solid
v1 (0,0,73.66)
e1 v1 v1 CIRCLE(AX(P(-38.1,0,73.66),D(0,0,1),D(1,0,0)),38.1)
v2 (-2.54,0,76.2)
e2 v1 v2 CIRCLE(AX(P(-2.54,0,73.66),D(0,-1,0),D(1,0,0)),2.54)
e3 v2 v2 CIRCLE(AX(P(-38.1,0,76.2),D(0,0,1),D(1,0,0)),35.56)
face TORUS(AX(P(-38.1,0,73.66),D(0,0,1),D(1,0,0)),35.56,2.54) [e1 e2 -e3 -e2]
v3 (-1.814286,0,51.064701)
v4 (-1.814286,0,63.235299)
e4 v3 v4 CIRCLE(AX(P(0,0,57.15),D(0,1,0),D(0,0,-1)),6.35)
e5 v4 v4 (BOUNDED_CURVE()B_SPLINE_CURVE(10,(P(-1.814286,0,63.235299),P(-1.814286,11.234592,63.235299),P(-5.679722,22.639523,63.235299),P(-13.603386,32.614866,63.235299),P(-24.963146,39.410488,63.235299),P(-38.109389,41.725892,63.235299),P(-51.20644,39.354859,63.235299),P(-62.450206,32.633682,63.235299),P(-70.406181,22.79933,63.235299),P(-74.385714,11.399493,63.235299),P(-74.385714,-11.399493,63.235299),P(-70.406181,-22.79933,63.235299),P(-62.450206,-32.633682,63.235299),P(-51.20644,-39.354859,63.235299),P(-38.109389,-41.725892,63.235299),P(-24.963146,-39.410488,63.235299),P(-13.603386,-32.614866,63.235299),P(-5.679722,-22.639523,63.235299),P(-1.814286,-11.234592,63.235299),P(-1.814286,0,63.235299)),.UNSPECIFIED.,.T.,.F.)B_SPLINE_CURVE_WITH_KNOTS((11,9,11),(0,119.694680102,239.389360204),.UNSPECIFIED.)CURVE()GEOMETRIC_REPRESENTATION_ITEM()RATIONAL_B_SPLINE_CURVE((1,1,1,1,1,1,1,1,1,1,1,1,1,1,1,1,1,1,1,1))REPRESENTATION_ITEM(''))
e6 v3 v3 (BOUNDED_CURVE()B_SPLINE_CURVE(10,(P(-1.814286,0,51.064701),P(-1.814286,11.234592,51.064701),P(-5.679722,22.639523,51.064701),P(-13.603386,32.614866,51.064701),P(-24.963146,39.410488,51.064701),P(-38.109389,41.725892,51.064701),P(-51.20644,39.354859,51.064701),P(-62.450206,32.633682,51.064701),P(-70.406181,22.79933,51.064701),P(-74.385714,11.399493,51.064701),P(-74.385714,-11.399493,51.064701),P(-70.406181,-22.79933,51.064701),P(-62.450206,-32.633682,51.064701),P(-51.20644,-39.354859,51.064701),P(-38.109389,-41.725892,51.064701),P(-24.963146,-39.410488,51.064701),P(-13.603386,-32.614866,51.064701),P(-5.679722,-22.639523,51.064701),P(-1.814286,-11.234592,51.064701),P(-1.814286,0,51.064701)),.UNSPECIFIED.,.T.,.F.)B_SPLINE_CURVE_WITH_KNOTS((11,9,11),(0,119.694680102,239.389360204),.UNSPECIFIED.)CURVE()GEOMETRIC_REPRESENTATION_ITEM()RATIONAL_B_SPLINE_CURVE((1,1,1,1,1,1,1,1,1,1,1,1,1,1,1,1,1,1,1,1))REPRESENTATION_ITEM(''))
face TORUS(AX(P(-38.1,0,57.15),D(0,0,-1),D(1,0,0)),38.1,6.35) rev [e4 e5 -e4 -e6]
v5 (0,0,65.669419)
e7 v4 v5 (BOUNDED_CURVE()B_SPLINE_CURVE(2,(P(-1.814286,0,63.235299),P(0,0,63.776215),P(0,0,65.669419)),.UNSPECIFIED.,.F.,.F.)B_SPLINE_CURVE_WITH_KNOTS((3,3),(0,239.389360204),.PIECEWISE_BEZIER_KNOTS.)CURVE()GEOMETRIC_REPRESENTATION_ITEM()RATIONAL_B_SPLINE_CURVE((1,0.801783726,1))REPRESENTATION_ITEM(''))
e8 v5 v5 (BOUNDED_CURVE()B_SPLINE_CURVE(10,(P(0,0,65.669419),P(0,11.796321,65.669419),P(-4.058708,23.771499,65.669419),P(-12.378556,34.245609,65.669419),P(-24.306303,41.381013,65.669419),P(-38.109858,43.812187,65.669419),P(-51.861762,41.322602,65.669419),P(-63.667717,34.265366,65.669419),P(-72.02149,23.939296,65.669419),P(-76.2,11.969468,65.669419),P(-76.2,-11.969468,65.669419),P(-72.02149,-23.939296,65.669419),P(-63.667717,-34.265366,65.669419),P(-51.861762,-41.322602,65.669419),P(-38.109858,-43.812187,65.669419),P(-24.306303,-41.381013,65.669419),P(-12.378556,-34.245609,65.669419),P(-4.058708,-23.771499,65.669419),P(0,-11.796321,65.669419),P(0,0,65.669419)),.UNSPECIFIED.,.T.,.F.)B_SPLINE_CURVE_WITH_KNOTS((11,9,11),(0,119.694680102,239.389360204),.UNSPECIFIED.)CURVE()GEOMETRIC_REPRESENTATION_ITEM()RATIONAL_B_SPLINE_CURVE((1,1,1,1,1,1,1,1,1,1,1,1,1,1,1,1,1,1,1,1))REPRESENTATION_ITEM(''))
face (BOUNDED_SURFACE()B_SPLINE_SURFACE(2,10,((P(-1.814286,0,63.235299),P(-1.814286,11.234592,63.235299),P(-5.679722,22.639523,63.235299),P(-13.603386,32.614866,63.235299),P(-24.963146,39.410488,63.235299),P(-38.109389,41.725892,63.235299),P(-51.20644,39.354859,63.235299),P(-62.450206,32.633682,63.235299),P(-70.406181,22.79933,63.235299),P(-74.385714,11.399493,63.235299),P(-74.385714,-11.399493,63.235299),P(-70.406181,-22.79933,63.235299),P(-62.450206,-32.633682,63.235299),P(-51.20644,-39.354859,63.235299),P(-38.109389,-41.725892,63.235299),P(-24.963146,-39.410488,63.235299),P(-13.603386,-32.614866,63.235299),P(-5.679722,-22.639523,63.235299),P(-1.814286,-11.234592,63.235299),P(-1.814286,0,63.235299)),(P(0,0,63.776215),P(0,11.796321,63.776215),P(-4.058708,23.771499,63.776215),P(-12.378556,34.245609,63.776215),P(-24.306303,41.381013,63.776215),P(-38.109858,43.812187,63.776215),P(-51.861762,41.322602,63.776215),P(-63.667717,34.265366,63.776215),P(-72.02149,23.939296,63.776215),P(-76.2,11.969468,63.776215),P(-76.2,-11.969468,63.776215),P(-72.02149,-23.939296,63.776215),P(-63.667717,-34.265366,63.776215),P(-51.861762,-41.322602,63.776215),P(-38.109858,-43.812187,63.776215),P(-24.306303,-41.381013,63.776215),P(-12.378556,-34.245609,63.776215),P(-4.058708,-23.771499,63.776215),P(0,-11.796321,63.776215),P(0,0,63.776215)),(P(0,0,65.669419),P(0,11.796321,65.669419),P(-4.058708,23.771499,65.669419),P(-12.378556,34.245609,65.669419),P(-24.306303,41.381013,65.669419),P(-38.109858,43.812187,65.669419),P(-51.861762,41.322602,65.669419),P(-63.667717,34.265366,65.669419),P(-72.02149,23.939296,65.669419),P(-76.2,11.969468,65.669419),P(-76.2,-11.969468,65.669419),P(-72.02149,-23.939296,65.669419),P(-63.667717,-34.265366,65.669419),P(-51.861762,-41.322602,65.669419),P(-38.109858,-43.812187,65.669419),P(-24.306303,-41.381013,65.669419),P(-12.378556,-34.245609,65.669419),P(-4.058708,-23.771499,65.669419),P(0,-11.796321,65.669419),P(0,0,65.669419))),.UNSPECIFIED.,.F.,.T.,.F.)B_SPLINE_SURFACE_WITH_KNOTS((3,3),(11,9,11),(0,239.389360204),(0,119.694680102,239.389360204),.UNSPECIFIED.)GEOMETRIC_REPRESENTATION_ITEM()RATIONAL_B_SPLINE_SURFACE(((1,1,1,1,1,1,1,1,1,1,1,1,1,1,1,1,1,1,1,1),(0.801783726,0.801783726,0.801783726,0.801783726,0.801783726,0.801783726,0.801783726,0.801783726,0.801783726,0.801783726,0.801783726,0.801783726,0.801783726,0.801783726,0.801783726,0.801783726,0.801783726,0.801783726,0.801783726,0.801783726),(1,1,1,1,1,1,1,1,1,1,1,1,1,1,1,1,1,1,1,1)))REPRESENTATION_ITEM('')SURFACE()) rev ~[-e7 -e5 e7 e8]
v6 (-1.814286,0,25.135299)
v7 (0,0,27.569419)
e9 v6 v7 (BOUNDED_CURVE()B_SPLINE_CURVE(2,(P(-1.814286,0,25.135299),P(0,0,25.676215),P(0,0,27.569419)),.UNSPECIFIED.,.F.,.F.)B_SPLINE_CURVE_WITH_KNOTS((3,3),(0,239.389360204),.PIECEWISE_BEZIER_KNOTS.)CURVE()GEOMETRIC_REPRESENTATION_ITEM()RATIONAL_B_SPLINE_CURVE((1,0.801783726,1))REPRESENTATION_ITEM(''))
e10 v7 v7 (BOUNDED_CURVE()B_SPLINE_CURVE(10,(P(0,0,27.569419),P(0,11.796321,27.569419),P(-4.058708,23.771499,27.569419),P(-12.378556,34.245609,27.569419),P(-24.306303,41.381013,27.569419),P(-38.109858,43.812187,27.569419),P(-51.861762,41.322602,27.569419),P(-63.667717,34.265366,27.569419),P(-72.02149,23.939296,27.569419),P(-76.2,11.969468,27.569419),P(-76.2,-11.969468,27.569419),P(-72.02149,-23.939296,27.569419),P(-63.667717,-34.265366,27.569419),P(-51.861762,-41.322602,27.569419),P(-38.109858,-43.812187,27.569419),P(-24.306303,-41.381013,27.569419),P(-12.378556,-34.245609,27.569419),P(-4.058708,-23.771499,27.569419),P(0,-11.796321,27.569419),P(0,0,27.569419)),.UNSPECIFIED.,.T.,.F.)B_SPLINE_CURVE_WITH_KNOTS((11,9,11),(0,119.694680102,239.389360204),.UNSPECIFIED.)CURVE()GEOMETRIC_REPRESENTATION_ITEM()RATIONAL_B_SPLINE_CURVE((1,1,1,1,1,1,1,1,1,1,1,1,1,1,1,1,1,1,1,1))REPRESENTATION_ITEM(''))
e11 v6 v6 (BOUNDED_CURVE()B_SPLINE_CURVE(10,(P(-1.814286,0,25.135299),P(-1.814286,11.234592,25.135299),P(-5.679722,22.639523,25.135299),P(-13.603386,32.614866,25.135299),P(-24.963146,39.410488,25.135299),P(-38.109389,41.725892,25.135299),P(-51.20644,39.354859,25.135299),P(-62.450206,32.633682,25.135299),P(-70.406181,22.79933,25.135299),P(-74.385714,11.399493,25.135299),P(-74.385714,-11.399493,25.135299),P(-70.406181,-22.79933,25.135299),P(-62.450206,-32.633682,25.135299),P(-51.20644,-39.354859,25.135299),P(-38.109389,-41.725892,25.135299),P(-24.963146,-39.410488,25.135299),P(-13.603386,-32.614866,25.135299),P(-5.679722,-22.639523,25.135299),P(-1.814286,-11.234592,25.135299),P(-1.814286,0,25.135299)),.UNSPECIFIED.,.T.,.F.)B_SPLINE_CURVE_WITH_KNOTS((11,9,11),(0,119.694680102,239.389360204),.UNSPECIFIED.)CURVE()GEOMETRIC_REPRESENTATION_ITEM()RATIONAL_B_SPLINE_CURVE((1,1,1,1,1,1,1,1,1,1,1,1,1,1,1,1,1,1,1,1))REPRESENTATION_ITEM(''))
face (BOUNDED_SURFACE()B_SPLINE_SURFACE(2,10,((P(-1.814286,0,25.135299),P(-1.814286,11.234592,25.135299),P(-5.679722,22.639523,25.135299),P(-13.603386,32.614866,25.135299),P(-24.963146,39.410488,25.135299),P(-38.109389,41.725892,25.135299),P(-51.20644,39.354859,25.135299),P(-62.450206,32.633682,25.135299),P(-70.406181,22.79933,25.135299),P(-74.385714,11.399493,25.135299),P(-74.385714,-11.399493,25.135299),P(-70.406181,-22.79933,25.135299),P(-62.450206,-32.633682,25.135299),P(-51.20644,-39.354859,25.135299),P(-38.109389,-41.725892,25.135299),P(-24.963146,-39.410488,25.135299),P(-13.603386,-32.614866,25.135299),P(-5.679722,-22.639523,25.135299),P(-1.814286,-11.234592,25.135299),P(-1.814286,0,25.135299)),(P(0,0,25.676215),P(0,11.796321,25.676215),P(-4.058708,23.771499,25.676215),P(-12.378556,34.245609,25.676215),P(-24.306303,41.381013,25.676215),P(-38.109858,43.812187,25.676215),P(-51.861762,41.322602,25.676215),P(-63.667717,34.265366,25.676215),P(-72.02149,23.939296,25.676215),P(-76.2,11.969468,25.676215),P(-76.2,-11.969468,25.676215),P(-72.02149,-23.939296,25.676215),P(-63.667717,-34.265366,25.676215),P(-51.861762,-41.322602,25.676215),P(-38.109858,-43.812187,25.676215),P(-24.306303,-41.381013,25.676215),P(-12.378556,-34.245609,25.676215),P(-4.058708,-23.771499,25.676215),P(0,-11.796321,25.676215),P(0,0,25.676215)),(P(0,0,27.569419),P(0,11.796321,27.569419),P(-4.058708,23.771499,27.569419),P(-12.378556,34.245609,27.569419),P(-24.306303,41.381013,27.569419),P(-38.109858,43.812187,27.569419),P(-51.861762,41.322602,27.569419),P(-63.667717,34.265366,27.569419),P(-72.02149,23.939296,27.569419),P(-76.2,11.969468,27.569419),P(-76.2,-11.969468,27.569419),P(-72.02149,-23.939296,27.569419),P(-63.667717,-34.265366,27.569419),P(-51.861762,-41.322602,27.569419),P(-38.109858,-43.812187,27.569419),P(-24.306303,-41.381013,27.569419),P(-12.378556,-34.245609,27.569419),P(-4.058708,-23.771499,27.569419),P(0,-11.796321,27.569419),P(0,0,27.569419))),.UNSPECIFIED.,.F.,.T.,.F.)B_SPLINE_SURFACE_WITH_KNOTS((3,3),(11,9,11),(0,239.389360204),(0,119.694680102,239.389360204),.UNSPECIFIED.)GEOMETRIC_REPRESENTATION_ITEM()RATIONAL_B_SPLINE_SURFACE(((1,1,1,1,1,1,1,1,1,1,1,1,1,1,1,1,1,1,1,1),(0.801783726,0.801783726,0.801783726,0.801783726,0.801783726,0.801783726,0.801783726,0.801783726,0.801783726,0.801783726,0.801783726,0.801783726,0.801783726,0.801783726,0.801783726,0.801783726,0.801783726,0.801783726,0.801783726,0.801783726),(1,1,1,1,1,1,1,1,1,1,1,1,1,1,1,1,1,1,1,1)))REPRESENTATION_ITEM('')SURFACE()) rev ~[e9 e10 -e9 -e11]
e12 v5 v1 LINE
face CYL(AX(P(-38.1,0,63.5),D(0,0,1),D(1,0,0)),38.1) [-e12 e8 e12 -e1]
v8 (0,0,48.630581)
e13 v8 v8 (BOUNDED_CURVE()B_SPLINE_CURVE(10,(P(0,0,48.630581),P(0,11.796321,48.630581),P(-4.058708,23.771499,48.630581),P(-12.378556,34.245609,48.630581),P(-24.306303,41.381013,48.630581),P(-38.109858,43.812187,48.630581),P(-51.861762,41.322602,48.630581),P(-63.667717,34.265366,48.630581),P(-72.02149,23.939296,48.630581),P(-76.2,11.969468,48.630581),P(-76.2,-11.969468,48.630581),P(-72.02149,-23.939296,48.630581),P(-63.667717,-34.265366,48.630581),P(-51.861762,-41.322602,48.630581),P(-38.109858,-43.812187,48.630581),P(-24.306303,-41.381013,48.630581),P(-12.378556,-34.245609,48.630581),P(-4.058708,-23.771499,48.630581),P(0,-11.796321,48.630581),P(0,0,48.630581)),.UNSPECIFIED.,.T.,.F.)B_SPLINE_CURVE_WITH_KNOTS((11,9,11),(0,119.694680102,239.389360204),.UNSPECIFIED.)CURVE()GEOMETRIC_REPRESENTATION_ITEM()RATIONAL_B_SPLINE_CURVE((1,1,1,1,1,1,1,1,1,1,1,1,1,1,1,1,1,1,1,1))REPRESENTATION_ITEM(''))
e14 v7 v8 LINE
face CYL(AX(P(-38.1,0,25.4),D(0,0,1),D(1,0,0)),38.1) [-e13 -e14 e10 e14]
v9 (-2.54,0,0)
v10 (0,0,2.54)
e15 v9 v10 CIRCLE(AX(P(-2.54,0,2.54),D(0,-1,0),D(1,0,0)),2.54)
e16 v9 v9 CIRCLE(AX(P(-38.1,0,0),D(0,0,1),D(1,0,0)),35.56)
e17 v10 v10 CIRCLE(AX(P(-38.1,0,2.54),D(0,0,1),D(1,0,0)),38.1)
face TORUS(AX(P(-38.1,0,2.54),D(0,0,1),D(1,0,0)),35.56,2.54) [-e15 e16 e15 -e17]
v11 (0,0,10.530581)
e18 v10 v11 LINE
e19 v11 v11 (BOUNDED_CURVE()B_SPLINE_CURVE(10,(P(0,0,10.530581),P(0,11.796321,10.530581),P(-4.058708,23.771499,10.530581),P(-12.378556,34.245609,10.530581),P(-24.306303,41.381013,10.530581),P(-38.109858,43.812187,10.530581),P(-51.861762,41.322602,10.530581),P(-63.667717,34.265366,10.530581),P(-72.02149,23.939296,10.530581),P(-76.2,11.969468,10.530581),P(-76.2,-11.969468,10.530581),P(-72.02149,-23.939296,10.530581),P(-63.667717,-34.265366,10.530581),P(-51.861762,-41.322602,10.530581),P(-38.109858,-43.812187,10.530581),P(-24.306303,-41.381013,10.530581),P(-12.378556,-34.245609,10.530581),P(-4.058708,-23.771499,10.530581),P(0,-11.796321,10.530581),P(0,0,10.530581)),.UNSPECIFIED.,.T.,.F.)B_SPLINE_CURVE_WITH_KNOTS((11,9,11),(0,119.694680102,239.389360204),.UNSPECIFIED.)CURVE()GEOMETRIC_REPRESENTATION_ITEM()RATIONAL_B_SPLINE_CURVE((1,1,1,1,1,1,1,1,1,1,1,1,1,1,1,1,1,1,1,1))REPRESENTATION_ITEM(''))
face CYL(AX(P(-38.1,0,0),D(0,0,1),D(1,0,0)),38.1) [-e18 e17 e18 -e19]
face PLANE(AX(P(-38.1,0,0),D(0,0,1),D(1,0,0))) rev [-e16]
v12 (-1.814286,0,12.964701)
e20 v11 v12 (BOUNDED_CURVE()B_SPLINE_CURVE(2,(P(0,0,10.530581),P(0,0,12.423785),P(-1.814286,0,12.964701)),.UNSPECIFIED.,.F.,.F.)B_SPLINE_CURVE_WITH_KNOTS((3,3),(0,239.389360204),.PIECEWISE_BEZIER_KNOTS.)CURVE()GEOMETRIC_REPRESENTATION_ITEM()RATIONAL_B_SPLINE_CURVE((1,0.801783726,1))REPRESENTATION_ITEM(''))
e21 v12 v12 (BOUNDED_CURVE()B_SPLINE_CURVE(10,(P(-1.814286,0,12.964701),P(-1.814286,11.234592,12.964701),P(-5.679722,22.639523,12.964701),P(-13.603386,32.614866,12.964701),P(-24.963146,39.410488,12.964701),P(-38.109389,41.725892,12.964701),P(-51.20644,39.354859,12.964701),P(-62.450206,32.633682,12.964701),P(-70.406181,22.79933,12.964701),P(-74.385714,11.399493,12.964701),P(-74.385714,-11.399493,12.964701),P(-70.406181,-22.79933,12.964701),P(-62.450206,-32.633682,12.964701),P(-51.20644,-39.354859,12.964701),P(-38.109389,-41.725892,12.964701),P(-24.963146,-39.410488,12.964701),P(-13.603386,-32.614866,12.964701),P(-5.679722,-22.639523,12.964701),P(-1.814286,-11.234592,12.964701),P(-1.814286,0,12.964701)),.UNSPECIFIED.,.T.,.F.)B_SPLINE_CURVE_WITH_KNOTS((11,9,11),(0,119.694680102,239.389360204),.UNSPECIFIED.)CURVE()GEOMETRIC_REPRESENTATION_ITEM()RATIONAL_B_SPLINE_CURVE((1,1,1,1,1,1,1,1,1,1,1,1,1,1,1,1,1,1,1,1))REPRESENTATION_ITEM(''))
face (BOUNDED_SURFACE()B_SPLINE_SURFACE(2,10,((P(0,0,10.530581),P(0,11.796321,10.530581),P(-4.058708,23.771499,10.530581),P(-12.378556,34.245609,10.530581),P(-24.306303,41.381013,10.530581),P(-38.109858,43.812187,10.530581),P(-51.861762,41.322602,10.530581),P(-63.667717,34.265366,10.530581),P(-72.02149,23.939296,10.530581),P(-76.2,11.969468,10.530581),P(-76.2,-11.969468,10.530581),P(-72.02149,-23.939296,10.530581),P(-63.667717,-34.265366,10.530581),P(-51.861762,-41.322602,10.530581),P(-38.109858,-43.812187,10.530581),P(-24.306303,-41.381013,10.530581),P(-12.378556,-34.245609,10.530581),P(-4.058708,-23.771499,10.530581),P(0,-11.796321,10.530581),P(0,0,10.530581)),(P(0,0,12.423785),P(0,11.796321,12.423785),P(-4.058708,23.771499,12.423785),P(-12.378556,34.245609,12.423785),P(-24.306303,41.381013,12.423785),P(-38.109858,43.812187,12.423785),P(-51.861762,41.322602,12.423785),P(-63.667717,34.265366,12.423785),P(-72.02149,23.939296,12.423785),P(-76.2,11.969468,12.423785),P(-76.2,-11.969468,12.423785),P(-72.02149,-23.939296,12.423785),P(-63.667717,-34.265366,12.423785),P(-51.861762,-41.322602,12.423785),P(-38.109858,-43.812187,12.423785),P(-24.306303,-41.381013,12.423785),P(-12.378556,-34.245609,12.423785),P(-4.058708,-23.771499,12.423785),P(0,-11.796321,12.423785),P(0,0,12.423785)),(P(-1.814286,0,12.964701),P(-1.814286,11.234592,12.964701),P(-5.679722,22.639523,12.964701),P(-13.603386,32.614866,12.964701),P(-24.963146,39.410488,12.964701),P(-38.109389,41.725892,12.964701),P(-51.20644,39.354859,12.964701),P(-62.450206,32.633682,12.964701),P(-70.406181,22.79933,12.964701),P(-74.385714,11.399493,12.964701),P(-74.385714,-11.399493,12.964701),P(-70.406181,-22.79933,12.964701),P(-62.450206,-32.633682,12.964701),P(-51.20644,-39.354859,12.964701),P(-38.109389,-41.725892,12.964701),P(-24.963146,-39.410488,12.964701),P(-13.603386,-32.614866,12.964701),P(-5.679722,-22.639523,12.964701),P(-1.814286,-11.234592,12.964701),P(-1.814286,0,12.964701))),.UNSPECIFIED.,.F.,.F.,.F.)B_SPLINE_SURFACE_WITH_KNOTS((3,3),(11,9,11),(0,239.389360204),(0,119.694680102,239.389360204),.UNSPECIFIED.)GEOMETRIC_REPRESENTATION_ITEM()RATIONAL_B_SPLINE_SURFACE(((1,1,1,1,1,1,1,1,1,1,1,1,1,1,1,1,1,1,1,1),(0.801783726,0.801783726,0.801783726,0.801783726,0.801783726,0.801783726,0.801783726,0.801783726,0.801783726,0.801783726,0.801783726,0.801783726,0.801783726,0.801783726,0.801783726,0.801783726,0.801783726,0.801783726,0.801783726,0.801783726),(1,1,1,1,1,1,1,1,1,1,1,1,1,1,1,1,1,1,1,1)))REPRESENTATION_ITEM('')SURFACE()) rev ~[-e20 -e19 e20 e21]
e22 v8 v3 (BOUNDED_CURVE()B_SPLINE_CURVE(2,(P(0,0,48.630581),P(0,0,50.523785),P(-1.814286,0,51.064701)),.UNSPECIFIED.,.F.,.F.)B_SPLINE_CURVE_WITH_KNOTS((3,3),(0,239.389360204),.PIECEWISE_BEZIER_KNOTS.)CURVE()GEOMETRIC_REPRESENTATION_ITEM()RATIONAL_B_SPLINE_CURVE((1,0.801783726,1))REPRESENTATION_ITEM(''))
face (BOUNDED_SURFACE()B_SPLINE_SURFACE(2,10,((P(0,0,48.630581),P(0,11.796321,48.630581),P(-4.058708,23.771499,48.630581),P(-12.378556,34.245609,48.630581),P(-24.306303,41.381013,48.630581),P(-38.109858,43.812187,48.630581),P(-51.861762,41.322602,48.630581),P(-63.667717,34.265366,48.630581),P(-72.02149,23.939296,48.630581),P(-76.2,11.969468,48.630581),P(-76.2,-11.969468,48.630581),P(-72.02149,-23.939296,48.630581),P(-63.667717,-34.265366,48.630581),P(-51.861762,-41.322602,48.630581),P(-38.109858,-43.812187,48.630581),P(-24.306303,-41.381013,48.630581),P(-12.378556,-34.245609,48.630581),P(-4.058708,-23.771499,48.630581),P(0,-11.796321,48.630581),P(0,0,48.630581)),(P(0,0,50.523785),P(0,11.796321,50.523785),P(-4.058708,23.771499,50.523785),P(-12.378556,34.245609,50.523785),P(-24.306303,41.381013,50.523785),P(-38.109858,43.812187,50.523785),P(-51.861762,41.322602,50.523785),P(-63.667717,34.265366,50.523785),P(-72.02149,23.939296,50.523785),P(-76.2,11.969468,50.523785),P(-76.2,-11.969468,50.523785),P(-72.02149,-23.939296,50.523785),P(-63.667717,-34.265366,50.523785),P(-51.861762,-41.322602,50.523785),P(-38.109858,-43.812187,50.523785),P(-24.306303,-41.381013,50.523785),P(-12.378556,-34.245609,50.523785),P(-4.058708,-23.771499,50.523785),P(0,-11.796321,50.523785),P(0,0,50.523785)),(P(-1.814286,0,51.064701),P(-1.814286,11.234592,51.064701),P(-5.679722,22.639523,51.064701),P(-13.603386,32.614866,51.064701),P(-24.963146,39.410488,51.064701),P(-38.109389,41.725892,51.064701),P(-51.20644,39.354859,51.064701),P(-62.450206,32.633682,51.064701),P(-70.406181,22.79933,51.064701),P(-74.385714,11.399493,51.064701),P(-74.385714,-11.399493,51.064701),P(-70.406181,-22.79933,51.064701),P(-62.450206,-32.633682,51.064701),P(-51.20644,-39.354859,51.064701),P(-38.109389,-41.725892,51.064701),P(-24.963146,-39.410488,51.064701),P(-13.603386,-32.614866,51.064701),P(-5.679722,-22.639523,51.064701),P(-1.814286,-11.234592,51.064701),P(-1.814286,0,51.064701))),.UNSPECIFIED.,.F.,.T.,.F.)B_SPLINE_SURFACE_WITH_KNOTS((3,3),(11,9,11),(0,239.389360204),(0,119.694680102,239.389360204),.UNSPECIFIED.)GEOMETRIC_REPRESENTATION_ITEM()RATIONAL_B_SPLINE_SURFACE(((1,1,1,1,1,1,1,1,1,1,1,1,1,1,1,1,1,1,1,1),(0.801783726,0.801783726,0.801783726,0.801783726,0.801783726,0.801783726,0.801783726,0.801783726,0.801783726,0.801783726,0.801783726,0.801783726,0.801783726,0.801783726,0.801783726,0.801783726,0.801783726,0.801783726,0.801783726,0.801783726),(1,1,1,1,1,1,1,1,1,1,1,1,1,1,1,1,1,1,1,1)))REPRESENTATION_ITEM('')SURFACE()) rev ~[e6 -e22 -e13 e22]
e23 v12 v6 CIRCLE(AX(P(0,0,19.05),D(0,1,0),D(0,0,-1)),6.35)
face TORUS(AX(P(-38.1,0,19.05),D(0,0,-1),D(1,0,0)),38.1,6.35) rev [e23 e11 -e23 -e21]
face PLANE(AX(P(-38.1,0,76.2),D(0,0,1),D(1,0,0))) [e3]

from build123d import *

# Parameters (mm, degrees)
F2_R = 2.54


with BuildPart() as f1:
    # F0 (on Front) → F1 (revolve)
    with BuildSketch(Plane.XZ):
        with BuildLine():
            Line((-38.1, 0), (0, 0))
            Line((0, 0), (0, 12.7))
            ThreePointArc((0, 12.7), (-6.35, 19.05), (0, 25.4))
            Line((0, 25.4), (0, 50.8))
            ThreePointArc((0, 50.8), (-6.35, 57.15), (0, 63.5))
            Line((0, 63.5), (0, 76.2))
            Line((0, 76.2), (-38.1, 76.2))
            Line((-38.1, 76.2), (-38.1, 0))
        make_face()
    revolve(axis=Axis((-38.1, 0, 38.1), (0, 0, 1)))

    # F2
    f2_edges = [f1.edges().sort_by_distance(p)[0] for p in [
        (-76.2, 0, 76.2),
        (-76.2, 0, 63.5),
        (-76.2, 0, 25.4),
        (-76.2, 0, 0),
        (-76.2, 0, 12.7),
        (0, 0, 6.35),
        (-76.2, 0, 50.8),
    ]]
    fillet(f2_edges, radius=F2_R)


solid = f1.part
